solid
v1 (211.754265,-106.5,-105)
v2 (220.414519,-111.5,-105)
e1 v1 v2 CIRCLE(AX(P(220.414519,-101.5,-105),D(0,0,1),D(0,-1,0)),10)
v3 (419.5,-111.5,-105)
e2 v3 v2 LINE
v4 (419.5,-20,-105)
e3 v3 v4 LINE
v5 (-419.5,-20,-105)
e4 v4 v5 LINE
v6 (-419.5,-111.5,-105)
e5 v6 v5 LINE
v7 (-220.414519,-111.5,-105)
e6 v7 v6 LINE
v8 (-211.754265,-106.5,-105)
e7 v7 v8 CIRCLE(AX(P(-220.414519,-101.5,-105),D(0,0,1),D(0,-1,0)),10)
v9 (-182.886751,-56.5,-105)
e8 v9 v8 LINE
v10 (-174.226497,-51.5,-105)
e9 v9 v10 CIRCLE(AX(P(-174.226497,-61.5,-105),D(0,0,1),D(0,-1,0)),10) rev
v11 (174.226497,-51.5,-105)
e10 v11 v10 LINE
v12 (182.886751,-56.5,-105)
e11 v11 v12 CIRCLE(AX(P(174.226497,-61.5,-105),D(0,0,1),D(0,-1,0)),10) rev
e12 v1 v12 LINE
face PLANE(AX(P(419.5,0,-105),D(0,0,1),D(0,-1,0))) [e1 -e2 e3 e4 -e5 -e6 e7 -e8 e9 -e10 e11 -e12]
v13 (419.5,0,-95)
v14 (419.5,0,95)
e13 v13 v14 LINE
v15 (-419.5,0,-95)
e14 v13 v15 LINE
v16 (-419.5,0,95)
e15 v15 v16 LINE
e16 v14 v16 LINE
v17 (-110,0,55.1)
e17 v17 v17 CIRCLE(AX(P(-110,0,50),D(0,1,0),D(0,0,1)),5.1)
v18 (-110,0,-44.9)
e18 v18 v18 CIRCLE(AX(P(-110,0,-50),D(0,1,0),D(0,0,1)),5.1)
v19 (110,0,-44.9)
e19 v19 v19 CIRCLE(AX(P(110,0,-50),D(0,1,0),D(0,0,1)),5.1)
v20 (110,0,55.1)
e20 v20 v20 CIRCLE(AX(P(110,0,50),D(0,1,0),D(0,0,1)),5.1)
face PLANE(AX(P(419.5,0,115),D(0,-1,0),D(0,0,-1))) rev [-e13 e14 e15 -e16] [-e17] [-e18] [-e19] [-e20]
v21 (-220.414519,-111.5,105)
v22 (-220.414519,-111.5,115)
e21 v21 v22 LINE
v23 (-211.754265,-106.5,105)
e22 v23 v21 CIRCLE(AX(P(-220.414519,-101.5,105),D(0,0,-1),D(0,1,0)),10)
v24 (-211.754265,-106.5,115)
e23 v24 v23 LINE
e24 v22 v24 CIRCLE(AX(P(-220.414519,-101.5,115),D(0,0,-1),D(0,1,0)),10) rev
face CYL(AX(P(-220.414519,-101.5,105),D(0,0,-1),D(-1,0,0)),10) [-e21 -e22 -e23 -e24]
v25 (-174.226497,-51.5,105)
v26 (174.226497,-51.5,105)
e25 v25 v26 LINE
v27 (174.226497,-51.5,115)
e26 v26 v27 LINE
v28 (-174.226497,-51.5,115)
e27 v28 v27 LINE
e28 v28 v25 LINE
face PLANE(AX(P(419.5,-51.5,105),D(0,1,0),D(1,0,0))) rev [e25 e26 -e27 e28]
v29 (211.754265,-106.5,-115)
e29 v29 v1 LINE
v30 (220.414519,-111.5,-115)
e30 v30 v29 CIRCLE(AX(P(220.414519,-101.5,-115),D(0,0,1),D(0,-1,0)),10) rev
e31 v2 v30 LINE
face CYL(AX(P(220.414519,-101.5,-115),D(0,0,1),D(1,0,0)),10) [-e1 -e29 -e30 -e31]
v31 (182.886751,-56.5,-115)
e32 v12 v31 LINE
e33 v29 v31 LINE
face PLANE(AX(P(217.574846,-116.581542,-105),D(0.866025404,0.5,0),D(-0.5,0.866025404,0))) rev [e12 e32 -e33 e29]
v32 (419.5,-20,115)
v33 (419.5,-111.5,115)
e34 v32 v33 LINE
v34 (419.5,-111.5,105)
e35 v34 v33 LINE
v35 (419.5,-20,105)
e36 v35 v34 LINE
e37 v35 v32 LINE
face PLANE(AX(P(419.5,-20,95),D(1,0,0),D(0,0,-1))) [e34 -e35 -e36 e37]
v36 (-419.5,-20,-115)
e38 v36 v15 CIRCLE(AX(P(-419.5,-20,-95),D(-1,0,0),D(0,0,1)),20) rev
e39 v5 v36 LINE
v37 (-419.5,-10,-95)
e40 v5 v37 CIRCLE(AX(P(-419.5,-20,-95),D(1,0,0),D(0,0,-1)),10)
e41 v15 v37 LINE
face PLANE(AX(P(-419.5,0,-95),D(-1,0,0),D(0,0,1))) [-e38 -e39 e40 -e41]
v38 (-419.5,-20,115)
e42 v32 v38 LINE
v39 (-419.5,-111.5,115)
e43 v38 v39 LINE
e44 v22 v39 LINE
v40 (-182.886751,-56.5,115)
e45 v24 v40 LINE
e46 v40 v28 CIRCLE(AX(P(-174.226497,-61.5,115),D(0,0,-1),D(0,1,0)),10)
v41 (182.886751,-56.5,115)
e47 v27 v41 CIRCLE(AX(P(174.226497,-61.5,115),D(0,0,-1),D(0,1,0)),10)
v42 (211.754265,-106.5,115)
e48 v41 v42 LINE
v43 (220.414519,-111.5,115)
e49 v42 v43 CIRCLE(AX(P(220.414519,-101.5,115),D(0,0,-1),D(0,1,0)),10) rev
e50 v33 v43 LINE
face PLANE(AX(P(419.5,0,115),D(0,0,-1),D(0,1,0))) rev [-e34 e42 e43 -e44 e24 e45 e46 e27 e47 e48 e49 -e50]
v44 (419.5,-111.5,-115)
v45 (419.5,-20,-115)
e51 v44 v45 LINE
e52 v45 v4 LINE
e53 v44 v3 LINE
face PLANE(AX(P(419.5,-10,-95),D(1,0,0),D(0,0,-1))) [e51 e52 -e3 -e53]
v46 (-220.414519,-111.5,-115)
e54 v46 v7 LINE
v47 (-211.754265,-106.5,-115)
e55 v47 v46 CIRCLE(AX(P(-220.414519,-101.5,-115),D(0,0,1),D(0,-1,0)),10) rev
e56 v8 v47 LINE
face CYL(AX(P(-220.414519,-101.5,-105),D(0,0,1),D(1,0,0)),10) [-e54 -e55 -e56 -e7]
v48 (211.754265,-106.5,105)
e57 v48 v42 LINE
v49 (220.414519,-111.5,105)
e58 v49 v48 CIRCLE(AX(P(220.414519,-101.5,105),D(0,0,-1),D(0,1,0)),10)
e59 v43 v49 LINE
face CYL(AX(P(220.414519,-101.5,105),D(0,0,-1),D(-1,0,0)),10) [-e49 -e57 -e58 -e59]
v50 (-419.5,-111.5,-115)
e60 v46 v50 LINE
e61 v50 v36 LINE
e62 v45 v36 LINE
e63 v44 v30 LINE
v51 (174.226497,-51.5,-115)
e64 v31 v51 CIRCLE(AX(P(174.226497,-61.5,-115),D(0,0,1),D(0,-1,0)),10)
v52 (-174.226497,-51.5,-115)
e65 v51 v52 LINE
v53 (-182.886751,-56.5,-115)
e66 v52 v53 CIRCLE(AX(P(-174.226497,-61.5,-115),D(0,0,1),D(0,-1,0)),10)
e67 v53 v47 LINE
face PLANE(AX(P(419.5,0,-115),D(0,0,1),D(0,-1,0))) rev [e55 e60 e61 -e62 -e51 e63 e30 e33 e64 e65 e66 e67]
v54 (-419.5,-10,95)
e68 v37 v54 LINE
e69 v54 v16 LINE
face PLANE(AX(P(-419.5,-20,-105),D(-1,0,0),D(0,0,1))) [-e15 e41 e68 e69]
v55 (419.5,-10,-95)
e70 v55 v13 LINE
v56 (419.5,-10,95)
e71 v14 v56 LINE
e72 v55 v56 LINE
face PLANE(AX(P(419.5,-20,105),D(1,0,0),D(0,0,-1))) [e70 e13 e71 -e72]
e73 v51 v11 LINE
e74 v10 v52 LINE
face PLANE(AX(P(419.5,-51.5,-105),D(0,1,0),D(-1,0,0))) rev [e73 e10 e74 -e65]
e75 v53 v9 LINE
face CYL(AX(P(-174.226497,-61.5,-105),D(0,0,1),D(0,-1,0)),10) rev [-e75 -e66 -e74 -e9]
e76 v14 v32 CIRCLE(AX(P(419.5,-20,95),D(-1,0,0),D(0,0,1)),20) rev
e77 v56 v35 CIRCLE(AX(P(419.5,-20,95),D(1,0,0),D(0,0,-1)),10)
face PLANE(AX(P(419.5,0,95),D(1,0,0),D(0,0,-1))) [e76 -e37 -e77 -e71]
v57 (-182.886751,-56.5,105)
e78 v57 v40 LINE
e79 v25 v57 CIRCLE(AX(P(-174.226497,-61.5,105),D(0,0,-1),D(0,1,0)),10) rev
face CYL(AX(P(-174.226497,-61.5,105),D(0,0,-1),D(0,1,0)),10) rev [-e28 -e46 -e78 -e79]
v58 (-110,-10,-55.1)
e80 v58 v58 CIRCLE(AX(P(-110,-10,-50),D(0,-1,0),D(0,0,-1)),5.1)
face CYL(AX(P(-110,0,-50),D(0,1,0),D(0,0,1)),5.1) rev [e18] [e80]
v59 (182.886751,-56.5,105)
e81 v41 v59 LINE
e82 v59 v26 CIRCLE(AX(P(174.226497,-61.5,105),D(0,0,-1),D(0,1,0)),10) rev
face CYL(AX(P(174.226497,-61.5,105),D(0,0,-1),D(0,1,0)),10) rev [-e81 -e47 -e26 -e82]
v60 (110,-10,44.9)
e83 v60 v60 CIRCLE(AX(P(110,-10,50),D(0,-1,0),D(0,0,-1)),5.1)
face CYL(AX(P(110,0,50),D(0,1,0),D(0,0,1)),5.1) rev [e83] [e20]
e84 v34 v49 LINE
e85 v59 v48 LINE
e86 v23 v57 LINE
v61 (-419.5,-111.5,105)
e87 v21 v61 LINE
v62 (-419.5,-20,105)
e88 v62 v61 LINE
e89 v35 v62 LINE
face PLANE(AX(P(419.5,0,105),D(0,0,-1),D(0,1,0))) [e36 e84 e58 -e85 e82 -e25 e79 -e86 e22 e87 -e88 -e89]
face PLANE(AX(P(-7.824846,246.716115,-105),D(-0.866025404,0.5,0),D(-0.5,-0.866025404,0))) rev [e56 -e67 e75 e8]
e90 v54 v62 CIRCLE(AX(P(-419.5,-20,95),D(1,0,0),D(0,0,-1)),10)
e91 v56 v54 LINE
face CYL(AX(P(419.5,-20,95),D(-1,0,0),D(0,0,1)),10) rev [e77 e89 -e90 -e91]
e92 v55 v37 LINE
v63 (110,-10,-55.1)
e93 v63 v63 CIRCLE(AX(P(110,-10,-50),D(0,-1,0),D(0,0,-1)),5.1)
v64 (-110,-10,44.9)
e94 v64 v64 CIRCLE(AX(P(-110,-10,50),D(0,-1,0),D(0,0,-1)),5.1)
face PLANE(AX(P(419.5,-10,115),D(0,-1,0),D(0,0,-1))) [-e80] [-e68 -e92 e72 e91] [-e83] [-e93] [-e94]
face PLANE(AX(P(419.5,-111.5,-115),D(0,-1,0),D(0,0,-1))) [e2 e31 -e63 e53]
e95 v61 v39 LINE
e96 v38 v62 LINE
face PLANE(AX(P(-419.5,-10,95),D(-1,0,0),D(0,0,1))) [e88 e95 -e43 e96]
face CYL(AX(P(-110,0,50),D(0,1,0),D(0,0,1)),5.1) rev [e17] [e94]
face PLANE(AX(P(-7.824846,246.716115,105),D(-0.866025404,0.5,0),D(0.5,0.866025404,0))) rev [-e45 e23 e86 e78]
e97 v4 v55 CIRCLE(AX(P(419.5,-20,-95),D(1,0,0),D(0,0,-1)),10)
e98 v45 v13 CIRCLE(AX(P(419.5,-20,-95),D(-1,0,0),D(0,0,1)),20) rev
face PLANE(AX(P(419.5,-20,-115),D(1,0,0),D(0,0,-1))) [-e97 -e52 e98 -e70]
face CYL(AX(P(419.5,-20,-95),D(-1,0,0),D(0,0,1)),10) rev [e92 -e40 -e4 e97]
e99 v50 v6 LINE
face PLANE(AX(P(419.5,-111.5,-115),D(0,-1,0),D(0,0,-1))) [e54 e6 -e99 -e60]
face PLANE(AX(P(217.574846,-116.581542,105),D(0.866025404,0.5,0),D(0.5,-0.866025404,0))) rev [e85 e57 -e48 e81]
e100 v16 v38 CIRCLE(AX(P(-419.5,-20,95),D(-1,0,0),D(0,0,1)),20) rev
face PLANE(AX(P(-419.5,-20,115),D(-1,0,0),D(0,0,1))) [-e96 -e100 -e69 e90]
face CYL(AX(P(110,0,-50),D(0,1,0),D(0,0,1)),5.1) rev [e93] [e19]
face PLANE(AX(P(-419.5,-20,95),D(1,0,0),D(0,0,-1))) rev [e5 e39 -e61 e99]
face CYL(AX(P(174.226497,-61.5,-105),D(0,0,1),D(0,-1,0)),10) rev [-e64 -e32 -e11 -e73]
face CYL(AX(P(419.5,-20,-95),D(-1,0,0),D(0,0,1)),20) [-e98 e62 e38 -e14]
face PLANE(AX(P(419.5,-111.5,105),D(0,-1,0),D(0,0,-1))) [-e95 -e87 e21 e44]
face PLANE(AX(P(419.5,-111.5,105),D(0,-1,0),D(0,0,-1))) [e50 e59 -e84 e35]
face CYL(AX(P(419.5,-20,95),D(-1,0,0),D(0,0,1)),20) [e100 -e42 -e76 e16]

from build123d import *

# Parameters (mm, degrees)
SM_BASE_FLANGE_1_DEPTH  = 419.5
CUT_EXTRUDE_1_DEPTH     = 492.235686814
FILLET_1_R              = 10
HOLE_WIZARD_M12_1_D     = 10.2
HOLE_WIZARD_M12_1_DEPTH = 32.75
HOLE_WIZARD_M12_1_TIP   = 3.064389157


# Sheet-metal steps are written as plain solids
with BuildPart() as part:
    # Sketch 1 → 基体-法兰1 (new, symmetric)
    with BuildSketch(Plane(origin=(0, 0, 0), x_dir=(0, 0, -1), z_dir=(1, 0, 0))):
        with BuildLine():
            Line((-115, -111.5), (-115, -20))
            ThreePointArc((-115, -20), (-109.142135624, -5.857864376), (-95, 0))
            Line((-95, 0), (95, 0))
            ThreePointArc((95, 0), (109.142135624, -5.857864376), (115, -20))
            Line((115, -20), (115, -111.5))
            Line((115, -111.5), (105, -111.5))
            Line((105, -111.5), (105, -20))
            ThreePointArc((105, -20), (102.071067812, -12.928932188), (95, -10))
            Line((95, -10), (-95, -10))
            ThreePointArc((-95, -10), (-102.071067812, -12.928932188), (-105, -20))
            Line((-105, -20), (-105, -111.5))
            Line((-105, -111.5), (-115, -111.5))
        make_face()
    extrude(amount=SM_BASE_FLANGE_1_DEPTH, both=True)

    # Sketch 2 → 切除-拉伸1 (cut, through all)
    with BuildSketch(Plane(origin=(0, 0, -115), x_dir=(-1, 0, 0), z_dir=(0, 0, -1))):
        Polygon((-214.641016151, -111.5), (-180, -51.5), (180, -51.5), (214.641016151, -111.5), align=None)
    extrude(amount=-CUT_EXTRUDE_1_DEPTH, mode=Mode.SUBTRACT)

    # 圆角1
    fillet_1_edges = [part.edges().sort_by_distance(p)[0] for p in [
        (-214.641016151, -111.5, -110),
        (214.641016151, -111.5, -110),
        (180, -51.5, -110),
        (-180, -51.5, -110),
        (214.641016151, -111.5, 110),
        (-214.641016151, -111.5, 110),
        (-180, -51.5, 110),
        (180, -51.5, 110),
    ]]
    fillet(fillet_1_edges, radius=FILLET_1_R)

    # M12 螺纹孔1
    with Locations(Plane(origin=(0, 0, 0), x_dir=(1, 0, 0), z_dir=(0, 1, 0))):
        with Locations((-110, 50), (110, 50), (110, -50), (-110, -50)):
            Hole(HOLE_WIZARD_M12_1_D / 2, depth=HOLE_WIZARD_M12_1_DEPTH)
            with Locations((0, 0, -(HOLE_WIZARD_M12_1_DEPTH + HOLE_WIZARD_M12_1_TIP / 2))):  # 118° drill point
                Cone(0, HOLE_WIZARD_M12_1_D / 2, HOLE_WIZARD_M12_1_TIP, mode=Mode.SUBTRACT)


solid = part.part
